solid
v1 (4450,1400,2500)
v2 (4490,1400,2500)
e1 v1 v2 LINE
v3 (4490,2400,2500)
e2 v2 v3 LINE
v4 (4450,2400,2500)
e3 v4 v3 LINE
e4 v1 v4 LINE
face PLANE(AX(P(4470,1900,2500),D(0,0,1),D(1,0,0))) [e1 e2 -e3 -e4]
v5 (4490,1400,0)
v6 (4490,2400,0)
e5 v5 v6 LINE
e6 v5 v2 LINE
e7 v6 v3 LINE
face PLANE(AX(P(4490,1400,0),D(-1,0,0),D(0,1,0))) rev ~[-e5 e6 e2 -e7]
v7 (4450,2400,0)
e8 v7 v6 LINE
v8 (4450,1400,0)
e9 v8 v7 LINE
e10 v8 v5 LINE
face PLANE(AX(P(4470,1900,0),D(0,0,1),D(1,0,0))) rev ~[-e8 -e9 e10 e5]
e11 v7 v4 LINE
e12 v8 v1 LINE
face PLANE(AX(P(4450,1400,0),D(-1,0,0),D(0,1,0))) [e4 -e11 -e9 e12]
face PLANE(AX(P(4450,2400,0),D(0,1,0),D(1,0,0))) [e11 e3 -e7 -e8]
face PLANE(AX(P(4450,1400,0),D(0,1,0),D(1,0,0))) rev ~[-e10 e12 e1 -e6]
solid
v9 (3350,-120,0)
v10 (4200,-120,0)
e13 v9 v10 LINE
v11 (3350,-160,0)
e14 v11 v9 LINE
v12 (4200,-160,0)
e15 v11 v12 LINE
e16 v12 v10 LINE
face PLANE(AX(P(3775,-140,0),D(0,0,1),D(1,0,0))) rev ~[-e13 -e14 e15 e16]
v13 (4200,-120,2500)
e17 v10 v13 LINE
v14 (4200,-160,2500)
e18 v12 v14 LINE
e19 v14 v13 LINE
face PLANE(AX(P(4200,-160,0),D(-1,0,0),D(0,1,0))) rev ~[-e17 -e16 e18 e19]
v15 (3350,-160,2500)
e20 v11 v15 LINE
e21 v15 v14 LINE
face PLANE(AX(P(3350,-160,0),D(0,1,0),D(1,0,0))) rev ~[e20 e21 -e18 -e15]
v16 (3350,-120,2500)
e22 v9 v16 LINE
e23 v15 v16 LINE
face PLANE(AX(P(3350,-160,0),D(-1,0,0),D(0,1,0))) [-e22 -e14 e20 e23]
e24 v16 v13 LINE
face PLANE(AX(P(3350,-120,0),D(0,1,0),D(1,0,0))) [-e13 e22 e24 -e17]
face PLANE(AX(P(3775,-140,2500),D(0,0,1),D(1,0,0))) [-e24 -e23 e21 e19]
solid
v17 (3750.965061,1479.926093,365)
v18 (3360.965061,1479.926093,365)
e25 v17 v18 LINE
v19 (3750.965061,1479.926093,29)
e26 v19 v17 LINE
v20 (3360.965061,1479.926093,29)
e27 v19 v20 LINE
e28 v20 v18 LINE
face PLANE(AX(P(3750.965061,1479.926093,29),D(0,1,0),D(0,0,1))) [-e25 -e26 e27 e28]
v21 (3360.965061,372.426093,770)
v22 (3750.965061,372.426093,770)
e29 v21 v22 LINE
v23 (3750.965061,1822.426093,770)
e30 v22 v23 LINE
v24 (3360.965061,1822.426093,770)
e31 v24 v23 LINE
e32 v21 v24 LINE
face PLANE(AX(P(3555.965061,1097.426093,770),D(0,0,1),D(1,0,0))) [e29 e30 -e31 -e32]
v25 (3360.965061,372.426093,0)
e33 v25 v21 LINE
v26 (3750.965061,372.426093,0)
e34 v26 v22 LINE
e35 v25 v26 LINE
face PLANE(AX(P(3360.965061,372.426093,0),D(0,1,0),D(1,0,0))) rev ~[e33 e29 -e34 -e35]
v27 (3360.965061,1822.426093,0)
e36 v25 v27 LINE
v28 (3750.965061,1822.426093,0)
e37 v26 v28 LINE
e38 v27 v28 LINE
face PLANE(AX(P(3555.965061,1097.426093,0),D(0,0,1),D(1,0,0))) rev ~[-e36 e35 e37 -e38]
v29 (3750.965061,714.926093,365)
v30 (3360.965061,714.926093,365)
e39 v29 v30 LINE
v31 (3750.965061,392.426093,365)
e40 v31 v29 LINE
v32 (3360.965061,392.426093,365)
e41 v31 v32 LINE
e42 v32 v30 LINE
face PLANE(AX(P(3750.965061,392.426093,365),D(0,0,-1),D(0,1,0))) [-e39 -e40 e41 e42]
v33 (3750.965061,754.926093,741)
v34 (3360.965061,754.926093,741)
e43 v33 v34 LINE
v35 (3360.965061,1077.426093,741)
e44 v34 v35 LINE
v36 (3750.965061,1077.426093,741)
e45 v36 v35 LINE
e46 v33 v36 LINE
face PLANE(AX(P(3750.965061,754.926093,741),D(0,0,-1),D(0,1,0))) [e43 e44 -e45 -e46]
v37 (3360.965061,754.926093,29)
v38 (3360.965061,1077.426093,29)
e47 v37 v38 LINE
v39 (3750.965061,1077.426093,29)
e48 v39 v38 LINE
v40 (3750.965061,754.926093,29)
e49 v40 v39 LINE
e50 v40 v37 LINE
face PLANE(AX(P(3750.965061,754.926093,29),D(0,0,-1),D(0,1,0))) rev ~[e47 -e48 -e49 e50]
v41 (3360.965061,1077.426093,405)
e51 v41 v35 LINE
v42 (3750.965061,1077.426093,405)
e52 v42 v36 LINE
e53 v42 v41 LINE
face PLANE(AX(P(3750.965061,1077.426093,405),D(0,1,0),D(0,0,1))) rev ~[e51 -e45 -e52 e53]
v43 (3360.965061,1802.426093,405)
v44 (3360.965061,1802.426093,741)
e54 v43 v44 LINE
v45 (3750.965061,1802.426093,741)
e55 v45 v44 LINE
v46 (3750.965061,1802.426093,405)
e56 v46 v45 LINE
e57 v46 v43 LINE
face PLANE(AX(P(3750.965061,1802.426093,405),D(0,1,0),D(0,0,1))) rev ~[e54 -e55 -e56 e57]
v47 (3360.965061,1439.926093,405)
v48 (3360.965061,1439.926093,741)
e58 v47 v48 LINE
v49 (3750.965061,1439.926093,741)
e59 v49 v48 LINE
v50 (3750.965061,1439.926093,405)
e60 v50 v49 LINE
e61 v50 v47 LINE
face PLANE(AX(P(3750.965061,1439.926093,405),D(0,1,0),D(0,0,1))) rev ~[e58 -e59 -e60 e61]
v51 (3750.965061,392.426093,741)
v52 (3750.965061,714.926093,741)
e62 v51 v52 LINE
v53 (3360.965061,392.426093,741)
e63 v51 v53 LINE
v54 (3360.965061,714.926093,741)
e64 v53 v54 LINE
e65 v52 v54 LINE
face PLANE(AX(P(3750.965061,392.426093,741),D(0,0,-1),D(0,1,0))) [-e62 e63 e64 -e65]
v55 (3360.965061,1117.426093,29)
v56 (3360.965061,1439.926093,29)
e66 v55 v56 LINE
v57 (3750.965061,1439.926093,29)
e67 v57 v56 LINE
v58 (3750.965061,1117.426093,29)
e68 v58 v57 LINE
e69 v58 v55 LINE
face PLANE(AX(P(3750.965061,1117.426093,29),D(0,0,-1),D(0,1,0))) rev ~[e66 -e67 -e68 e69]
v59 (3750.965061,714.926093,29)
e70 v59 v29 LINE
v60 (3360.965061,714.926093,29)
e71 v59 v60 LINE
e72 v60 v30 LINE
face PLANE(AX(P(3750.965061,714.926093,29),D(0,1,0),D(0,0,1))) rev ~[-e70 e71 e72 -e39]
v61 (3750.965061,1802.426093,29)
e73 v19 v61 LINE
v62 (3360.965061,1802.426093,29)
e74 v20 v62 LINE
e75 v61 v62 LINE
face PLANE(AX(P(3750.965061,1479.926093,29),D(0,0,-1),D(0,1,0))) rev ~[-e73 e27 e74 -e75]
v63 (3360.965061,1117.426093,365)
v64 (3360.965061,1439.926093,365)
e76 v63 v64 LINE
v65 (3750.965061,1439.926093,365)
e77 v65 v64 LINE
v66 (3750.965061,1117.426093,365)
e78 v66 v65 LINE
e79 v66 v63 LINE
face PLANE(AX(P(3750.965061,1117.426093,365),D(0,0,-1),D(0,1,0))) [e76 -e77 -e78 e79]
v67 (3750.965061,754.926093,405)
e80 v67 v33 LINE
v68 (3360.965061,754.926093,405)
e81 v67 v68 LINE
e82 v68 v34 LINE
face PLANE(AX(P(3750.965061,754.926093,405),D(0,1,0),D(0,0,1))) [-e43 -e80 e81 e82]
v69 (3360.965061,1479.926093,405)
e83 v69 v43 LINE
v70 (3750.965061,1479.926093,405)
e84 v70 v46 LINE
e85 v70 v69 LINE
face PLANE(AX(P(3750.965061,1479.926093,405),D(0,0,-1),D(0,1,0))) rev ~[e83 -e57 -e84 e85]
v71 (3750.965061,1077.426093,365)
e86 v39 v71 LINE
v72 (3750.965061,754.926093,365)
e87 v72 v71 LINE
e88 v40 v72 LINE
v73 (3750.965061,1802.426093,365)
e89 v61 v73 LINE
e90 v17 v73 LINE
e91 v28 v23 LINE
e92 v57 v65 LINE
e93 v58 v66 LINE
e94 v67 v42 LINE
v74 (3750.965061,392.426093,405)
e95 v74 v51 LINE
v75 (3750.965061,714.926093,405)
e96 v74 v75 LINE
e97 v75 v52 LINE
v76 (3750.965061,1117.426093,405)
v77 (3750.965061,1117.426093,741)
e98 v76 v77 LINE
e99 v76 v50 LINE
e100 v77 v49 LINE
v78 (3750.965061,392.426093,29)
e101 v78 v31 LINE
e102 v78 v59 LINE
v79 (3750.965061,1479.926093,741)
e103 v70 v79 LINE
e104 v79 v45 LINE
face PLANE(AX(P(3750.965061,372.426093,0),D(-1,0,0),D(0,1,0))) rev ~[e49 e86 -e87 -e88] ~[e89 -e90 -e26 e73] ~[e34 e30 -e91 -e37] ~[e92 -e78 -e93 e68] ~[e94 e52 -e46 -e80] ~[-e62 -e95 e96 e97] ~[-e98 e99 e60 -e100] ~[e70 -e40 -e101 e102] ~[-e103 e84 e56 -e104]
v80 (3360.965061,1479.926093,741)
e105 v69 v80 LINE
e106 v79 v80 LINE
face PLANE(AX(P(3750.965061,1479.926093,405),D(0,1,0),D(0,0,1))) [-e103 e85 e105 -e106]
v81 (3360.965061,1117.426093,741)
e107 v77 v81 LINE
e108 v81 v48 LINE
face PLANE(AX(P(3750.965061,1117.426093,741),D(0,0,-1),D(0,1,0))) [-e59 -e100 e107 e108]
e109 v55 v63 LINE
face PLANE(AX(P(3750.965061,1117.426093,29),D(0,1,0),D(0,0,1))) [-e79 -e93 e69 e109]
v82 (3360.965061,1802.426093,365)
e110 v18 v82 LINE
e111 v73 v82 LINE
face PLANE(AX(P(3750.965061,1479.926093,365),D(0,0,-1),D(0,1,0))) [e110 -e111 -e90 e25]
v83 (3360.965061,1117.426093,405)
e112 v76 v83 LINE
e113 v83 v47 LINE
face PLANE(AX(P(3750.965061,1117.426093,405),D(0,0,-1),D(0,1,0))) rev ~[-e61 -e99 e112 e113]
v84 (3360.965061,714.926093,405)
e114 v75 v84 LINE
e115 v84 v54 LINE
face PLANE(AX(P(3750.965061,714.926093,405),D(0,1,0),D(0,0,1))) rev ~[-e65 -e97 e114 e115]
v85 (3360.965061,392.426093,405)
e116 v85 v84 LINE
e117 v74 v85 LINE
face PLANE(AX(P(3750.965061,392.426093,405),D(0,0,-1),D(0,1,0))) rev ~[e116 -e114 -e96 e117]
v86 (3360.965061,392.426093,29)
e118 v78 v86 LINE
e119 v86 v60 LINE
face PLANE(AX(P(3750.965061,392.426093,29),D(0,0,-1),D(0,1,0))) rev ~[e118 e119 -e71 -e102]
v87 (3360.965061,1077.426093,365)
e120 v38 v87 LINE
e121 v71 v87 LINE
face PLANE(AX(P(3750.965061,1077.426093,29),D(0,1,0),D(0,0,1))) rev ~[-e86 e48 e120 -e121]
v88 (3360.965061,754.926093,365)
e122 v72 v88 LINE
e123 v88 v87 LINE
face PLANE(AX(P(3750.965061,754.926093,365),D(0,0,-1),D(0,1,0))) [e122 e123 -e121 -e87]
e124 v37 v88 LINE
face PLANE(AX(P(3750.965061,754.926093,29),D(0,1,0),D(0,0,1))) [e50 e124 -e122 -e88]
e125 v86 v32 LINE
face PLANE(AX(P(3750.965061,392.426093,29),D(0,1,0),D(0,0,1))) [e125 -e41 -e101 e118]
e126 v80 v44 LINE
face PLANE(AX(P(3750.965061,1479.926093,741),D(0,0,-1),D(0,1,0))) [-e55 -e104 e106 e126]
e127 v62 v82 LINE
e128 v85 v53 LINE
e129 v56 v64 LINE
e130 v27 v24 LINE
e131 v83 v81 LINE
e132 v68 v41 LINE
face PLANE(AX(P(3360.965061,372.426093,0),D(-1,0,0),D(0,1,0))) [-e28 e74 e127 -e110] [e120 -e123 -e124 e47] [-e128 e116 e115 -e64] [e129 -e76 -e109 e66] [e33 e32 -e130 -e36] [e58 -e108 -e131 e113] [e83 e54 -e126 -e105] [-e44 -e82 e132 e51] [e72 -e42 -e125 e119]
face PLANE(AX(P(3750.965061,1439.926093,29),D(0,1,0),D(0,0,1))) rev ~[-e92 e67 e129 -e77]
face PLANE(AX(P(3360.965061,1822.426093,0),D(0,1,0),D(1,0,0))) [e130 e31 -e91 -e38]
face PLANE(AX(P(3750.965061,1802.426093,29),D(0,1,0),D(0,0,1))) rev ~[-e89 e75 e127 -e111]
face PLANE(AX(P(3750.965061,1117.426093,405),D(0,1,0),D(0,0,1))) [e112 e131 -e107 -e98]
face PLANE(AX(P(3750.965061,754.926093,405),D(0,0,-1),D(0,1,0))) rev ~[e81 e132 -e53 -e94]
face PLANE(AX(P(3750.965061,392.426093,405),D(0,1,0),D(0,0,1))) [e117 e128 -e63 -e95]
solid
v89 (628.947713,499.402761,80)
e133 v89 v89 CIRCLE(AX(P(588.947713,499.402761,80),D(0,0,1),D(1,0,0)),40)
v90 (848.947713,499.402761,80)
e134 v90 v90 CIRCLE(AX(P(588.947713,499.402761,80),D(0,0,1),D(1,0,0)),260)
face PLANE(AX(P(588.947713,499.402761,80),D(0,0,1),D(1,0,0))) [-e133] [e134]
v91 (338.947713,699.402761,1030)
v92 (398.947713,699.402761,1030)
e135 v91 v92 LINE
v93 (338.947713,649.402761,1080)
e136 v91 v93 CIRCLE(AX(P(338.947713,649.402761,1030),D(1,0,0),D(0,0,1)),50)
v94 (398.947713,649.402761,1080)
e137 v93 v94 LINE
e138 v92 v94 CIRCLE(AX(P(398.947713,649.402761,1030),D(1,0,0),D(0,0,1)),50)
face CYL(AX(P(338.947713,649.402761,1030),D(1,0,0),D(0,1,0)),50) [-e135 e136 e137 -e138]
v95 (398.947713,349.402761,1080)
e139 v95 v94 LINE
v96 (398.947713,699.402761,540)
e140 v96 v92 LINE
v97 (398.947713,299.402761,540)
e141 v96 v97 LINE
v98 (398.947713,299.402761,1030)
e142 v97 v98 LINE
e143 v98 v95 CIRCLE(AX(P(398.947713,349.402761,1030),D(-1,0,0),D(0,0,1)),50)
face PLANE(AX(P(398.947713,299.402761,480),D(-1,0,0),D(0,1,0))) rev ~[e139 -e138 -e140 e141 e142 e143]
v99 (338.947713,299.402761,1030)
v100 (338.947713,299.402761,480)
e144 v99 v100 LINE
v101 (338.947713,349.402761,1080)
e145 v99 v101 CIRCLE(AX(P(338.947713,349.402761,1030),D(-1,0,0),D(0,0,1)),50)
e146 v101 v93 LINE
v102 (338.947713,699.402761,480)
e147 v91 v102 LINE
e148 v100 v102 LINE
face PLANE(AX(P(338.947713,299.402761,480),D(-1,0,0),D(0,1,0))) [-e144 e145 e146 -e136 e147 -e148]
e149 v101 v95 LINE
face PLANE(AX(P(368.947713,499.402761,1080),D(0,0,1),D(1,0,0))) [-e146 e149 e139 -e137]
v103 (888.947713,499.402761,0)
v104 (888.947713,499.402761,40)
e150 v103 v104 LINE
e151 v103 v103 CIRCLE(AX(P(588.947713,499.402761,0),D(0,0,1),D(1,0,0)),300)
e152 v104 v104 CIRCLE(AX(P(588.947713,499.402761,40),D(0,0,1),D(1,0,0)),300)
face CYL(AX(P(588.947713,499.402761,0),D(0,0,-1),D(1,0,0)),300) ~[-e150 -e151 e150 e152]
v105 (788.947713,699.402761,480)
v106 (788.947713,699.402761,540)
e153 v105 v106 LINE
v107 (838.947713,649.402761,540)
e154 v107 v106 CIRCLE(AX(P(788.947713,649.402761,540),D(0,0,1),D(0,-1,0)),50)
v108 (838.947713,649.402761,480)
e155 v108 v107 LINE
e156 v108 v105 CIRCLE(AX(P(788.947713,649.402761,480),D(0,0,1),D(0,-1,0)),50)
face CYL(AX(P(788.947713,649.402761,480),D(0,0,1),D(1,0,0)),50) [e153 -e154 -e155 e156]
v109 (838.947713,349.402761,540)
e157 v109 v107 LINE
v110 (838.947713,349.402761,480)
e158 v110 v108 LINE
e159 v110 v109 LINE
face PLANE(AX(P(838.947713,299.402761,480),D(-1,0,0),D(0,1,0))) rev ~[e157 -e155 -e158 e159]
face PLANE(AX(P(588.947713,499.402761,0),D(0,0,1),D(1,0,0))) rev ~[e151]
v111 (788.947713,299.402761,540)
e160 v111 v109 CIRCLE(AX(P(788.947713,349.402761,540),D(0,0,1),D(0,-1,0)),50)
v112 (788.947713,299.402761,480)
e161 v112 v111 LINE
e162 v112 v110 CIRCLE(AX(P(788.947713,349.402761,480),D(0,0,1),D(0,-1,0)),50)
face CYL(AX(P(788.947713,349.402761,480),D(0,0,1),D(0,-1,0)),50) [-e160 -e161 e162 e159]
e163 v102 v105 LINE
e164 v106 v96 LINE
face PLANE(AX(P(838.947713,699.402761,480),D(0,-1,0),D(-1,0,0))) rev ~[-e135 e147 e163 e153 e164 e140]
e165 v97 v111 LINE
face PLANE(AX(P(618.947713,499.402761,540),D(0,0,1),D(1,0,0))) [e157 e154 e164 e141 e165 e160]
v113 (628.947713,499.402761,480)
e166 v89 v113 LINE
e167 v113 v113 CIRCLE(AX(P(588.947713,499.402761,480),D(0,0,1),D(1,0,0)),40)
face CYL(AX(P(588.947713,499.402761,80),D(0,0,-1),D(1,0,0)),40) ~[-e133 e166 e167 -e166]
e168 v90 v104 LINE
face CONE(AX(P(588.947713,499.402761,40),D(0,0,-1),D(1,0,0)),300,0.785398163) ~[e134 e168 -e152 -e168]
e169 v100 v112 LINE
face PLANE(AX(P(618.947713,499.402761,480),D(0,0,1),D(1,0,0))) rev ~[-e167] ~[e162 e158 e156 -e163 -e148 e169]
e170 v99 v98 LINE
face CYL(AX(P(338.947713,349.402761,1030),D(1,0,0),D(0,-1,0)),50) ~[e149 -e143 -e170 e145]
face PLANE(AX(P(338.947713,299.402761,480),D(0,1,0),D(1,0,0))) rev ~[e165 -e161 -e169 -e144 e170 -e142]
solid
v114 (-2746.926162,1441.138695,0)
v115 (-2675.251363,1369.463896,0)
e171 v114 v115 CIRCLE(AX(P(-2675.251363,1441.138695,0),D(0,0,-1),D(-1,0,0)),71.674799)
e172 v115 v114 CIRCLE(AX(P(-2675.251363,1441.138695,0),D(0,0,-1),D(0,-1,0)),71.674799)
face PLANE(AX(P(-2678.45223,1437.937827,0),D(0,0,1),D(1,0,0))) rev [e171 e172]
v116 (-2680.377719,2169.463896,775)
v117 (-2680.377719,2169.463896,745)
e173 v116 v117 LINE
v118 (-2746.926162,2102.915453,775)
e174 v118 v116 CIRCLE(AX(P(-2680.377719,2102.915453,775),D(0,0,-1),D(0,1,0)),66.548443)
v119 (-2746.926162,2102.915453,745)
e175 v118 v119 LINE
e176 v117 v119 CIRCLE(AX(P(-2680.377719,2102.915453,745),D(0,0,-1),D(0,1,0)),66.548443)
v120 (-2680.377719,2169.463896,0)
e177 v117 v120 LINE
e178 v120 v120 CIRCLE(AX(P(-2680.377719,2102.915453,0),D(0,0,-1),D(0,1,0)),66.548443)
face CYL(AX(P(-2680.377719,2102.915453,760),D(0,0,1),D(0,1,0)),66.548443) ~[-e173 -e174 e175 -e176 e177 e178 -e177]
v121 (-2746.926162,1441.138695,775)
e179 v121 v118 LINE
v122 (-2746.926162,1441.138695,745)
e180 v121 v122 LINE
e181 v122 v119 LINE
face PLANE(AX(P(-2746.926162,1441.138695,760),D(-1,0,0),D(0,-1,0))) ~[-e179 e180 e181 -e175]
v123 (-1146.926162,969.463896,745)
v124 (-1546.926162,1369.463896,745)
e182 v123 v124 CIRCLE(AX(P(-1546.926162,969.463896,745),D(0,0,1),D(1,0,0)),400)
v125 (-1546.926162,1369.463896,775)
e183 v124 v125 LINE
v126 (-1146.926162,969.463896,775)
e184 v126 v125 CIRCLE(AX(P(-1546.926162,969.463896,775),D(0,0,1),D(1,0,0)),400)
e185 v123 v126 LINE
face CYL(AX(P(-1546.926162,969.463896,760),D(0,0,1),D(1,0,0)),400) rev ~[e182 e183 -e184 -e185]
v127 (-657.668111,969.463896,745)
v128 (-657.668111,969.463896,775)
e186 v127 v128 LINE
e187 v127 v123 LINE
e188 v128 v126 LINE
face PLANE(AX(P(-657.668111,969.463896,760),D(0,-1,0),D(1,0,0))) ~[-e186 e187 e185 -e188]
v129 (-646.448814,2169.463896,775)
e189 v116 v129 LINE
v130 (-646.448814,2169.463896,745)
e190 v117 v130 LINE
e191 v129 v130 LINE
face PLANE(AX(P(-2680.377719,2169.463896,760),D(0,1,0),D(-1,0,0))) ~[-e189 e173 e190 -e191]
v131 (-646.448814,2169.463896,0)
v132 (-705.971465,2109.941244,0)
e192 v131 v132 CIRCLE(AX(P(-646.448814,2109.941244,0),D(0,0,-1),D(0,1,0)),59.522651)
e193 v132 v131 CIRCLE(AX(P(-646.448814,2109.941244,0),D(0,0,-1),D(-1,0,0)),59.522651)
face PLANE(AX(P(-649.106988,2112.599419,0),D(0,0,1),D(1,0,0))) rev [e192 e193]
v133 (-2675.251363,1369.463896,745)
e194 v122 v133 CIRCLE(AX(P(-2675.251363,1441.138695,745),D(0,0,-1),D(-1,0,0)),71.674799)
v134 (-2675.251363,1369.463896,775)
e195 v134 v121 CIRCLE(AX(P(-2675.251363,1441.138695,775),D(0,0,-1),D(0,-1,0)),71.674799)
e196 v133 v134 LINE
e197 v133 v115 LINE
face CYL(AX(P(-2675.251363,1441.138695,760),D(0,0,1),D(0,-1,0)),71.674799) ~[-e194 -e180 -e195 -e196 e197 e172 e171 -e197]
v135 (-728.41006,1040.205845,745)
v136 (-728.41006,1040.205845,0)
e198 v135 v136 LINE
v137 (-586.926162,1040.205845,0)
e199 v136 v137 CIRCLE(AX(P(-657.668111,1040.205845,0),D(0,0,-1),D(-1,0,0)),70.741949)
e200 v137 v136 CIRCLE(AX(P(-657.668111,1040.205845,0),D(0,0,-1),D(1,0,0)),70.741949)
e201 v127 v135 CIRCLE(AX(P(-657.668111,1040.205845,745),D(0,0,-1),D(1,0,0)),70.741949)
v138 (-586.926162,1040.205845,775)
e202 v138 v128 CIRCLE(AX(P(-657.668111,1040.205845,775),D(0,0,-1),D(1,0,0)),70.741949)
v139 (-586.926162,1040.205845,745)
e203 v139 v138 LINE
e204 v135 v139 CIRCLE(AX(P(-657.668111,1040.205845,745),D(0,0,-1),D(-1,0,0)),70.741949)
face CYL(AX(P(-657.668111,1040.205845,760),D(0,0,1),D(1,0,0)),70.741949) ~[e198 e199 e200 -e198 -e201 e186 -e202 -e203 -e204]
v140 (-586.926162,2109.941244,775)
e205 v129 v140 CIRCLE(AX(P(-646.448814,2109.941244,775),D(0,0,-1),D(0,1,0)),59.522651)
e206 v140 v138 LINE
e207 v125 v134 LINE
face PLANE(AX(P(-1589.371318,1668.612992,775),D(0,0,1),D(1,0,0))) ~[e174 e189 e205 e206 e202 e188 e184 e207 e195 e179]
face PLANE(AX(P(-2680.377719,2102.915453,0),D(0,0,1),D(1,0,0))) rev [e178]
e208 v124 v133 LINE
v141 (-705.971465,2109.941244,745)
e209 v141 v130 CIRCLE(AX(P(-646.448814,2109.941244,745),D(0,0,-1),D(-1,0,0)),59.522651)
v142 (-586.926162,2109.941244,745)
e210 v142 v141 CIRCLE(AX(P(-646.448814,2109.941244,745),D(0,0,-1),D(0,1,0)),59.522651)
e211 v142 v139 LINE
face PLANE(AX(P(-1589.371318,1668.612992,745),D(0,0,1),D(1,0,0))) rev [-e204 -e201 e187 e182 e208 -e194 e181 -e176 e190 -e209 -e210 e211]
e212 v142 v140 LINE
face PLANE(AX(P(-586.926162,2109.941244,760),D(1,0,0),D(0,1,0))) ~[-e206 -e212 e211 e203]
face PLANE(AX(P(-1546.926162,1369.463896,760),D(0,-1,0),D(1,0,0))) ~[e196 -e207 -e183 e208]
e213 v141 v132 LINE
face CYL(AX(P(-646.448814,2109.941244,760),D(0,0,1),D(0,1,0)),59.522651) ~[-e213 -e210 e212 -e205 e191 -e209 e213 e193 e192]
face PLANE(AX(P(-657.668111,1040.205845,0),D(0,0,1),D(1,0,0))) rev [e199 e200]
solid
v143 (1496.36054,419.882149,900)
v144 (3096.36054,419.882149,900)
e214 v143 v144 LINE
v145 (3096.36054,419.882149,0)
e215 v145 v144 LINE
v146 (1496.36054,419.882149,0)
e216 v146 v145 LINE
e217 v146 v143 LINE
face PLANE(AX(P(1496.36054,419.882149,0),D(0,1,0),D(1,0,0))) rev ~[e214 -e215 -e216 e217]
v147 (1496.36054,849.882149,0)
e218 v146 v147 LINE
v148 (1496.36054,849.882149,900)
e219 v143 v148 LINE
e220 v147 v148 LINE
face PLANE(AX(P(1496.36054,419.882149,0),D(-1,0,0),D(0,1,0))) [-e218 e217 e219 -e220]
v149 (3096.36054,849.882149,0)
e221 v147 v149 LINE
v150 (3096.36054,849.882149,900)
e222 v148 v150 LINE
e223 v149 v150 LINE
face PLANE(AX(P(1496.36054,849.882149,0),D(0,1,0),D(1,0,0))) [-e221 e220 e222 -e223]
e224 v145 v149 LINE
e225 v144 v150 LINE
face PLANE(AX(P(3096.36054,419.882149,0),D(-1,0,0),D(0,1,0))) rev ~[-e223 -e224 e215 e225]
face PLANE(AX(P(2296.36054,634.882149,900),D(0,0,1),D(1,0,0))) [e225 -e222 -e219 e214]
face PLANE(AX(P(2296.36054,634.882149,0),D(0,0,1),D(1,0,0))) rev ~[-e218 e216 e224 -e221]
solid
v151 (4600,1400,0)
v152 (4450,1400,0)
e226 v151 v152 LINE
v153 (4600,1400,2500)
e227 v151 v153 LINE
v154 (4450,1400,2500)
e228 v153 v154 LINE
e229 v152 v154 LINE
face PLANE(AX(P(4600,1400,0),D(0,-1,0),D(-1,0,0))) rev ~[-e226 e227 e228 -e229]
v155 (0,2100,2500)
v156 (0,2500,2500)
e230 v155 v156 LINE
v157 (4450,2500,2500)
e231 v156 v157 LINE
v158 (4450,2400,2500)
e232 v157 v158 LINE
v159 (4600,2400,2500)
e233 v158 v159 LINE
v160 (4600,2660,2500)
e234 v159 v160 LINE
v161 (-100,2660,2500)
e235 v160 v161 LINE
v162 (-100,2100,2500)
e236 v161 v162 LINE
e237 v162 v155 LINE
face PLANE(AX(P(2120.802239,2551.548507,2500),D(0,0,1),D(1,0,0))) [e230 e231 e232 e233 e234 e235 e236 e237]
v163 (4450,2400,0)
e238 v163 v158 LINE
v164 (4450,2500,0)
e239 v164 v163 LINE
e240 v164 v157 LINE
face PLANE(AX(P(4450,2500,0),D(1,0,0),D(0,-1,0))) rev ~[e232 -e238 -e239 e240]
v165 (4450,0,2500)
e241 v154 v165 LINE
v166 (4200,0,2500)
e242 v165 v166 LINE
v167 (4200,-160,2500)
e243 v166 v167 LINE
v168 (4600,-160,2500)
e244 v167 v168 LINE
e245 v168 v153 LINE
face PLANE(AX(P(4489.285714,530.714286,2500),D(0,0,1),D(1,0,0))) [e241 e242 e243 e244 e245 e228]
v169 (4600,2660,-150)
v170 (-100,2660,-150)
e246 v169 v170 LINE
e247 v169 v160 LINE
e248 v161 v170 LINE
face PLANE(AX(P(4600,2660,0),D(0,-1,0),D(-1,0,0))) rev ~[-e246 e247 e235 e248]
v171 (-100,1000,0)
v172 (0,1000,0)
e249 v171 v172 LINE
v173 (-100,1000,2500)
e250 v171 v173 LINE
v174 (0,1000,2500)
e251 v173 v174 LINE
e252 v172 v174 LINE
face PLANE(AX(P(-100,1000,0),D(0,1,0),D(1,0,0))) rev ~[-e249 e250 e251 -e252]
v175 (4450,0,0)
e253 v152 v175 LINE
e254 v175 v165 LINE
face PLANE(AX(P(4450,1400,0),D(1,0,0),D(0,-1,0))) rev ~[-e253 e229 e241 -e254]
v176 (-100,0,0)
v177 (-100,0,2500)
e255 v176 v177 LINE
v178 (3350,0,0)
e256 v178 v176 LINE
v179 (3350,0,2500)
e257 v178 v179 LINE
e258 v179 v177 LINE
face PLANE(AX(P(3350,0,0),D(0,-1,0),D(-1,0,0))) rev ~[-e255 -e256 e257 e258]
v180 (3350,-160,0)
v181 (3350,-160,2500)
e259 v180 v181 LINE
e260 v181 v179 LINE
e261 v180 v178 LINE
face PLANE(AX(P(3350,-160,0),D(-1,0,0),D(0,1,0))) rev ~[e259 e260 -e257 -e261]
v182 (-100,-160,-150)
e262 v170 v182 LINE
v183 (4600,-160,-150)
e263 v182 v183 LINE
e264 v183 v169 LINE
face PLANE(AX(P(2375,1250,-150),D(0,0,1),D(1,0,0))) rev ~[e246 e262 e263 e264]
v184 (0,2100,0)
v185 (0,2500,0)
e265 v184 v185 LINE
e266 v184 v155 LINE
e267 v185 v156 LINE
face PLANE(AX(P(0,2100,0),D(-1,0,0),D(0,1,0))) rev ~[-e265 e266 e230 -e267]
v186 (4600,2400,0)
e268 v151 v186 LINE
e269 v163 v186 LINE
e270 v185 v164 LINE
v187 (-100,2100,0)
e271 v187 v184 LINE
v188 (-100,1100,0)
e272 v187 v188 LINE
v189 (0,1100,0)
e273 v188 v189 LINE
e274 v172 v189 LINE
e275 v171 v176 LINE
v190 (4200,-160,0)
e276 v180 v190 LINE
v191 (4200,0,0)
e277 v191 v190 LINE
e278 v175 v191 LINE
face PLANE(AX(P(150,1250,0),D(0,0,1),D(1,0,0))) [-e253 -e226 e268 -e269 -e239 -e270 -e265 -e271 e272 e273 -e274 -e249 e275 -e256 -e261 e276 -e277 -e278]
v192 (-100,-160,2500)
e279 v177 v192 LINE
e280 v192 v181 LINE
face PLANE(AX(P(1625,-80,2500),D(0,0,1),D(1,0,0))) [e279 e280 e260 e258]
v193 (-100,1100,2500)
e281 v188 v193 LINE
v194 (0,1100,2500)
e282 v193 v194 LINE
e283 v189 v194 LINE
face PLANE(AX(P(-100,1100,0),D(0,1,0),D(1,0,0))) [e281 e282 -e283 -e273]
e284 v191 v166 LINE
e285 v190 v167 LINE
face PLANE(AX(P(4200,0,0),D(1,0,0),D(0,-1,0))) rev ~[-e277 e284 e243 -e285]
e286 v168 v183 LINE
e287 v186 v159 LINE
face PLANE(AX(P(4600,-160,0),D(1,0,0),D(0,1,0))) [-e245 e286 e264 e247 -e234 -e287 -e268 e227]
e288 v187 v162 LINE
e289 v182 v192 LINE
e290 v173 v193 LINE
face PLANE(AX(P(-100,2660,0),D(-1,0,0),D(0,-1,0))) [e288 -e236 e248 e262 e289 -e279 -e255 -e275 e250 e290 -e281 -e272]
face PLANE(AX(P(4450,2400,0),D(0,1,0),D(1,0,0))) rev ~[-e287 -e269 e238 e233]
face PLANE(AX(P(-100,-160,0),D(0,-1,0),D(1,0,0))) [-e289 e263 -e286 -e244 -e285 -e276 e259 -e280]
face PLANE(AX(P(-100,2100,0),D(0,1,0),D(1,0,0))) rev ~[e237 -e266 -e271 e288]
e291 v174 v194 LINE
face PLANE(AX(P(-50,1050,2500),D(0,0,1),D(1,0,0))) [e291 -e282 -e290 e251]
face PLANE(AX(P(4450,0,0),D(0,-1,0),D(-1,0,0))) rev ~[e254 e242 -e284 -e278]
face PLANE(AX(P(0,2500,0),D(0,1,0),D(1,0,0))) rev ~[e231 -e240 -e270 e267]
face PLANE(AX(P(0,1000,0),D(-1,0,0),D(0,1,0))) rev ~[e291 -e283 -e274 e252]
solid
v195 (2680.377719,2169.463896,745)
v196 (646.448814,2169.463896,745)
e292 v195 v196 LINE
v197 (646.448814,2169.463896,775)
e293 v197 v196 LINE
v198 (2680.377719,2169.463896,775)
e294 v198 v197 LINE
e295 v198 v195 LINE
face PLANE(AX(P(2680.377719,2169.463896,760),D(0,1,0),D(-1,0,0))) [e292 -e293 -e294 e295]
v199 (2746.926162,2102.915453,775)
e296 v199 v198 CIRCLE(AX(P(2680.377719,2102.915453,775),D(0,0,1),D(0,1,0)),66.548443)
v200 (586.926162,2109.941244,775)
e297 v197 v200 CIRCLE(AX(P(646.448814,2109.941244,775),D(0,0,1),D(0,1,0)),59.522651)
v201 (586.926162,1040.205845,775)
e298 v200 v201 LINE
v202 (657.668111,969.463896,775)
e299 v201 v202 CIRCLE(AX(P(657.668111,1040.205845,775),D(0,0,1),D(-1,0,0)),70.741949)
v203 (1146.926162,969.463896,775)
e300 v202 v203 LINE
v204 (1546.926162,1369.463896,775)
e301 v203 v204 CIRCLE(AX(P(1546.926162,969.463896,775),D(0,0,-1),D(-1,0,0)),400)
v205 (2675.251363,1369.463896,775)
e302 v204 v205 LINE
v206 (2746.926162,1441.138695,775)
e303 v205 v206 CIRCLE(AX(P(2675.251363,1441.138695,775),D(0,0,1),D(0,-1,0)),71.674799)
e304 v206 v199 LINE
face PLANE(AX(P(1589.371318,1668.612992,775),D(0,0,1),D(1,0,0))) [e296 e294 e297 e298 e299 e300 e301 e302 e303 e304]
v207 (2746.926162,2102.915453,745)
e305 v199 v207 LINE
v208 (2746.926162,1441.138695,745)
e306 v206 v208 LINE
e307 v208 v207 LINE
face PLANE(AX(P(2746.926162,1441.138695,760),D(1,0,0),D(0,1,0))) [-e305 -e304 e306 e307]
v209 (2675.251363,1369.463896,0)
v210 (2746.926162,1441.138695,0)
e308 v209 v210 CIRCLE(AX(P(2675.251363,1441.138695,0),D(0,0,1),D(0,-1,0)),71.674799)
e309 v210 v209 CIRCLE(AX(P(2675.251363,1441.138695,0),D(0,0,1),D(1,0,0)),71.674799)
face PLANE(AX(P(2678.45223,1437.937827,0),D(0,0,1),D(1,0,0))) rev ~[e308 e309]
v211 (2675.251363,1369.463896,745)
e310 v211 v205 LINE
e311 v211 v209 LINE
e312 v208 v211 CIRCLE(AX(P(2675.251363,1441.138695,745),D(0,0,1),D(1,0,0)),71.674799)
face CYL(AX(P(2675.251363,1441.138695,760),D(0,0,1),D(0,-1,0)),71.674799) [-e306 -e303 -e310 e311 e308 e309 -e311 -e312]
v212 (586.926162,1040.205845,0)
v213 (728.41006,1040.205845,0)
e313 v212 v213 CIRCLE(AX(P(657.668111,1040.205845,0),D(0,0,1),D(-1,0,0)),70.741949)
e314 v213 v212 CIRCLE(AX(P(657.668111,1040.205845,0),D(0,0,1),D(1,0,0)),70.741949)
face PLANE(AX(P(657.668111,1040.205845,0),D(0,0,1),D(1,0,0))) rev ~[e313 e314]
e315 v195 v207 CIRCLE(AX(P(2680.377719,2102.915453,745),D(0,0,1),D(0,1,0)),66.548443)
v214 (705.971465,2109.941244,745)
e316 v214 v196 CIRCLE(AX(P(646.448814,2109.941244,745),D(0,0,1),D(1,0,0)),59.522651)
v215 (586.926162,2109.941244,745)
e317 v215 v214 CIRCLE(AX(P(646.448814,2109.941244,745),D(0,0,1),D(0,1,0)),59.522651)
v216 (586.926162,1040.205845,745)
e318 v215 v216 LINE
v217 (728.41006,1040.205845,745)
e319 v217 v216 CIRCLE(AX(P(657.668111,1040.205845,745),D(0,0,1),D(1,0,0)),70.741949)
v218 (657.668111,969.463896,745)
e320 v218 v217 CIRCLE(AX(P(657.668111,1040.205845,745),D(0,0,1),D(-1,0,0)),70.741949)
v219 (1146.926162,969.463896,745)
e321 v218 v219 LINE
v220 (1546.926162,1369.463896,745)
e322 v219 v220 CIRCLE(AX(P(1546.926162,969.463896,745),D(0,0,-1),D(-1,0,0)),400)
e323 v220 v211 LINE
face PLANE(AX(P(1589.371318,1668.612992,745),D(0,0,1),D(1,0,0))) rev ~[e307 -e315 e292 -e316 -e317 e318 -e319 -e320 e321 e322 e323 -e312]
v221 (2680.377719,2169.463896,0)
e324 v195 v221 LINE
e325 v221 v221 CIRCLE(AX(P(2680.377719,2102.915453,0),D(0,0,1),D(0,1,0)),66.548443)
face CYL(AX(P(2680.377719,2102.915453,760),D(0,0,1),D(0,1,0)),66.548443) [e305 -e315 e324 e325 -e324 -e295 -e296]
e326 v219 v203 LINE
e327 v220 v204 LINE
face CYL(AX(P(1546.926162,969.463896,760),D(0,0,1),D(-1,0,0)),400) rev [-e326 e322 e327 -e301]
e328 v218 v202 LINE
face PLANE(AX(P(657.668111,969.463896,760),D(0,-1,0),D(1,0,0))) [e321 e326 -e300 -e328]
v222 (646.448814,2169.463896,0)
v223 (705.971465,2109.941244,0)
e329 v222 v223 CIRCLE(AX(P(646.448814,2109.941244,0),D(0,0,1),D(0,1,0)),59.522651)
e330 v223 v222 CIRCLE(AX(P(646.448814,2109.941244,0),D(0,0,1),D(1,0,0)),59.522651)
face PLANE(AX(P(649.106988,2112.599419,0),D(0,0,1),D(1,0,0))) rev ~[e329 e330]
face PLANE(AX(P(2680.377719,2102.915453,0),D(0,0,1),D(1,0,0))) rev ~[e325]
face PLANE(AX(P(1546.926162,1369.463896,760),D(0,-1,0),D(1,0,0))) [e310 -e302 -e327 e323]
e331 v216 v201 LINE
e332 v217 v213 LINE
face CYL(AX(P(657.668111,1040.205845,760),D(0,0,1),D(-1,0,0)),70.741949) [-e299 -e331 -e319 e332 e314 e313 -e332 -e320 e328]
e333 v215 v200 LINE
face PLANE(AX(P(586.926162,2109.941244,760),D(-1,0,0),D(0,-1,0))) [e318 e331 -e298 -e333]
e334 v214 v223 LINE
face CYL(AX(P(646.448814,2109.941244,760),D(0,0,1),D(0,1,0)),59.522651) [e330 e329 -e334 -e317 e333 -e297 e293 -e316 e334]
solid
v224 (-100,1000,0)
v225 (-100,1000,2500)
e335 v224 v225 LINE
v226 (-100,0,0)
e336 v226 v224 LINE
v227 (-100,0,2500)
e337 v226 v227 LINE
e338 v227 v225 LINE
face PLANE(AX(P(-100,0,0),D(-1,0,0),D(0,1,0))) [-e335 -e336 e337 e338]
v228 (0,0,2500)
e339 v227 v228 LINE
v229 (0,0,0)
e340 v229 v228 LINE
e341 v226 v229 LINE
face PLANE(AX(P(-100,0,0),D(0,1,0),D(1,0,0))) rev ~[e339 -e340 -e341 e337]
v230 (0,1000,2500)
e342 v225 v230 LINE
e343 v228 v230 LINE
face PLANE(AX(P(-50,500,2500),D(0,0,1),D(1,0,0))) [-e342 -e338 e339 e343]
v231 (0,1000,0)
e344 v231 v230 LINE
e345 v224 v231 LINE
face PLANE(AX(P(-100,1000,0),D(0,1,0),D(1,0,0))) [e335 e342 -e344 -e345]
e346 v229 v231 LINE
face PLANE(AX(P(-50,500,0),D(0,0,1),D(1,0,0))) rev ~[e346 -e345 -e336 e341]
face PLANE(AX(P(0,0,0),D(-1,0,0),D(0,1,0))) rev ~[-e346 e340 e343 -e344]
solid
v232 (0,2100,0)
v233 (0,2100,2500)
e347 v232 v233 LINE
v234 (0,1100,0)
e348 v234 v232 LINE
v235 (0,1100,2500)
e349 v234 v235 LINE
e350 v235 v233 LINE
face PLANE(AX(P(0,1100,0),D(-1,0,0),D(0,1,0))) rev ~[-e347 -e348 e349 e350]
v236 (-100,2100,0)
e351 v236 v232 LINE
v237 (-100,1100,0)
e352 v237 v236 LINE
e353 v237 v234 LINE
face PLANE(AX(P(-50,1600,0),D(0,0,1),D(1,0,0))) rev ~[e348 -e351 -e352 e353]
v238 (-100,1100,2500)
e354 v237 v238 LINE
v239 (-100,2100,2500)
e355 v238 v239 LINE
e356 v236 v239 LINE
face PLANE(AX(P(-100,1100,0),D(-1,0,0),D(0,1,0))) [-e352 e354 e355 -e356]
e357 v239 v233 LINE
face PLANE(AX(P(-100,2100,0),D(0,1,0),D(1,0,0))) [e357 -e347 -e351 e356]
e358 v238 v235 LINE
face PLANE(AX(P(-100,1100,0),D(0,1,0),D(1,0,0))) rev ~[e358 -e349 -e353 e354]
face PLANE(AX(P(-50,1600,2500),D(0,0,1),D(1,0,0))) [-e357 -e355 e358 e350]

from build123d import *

# Parameters (mm, degrees)
F0_W      = 100
F0_H      = 1000
F0_H_2    = 100
F0_W_2    = 850
F0_H_3    = 120
F0_H_4    = 40
F0_W_3    = 110
F0_W_4    = 40
F1_DEPTH  = 150
F2_DEPTH  = 150
F3_DEPTH  = 2500
F4_DEPTH  = 2500
F5_DEPTH  = 2500
F8_DEPTH  = 15
F9_DEPTH  = 760
F11_W     = 1600
F11_H     = 430
F12_DEPTH = 900
F13_W     = 390
F13_H     = 1450
F14_DEPTH = 770
F15_W     = 322.5
F15_H     = 336
F16_DEPTH = 390
F17_R     = 300
F18_DEPTH = 80
F19_R     = 40
F20_DEPTH = 400
F21_W     = 440
F21_H     = 400
F21_W_2   = 60
F22_DEPTH = 60
F23_DEPTH = 600
F24_R     = 50
F25_SIZE  = 40


with BuildPart() as f1:
    # F0 (on Top) → F1 (new body)
    with BuildSketch(Plane.XY):
        Polygon((300, 2500), (300, 0), (3350, 0), (4200, 0), (4450, 0), (4450, 1400), (4450, 2400), (4450, 2500), align=None)
        Polygon((0, 2500), (300, 2500), (4450, 2500), (4450, 2400), (4490, 2400), (4600, 2400), (4600, 2660), (-100, 2660), (-100, 2100), (0, 2100), align=None)
        with Locations((-50, 1600)):
            Rectangle(F0_W, F0_H)
        with Locations((-50, 1050)):
            Rectangle(F0_W, F0_H_2)
        with Locations((-50, 500)):
            Rectangle(F0_W, F0_H)
        Polygon((300, 0), (0, 0), (-100, 0), (-100, -160), (3350, -160), (3350, -120), (3350, 0), align=None)
        with Locations((3775, -60)):
            Rectangle(F0_W_2, F0_H_3)
        with Locations((3775, -140)):
            Rectangle(F0_W_2, F0_H_4)
        Polygon((4450, 0), (4200, 0), (4200, -120), (4200, -160), (4600, -160), (4600, 1400), (4490, 1400), (4450, 1400), align=None)
        with Locations((4545, 1900)):
            Rectangle(F0_W_3, F0_H)
        with Locations((4470, 1900)):
            Rectangle(F0_W_4, F0_H)
    extrude(amount=-F1_DEPTH)

    # F0 (on Top) → F2 (join, through all)
    with BuildSketch(Plane.XY):
        Polygon((0, 1000), (0, 0), (300, 0), (300, 2500), (0, 2500), (0, 2100), (0, 1100), align=None)
    extrude(amount=-F2_DEPTH)

    # F0 (on Top) → F3 (join)
    with BuildSketch(Plane.XY):
        Polygon((0, 2500), (300, 2500), (4450, 2500), (4450, 2400), (4490, 2400), (4600, 2400), (4600, 2660), (-100, 2660), (-100, 2100), (0, 2100), align=None)
        Polygon((4450, 0), (4200, 0), (4200, -120), (4200, -160), (4600, -160), (4600, 1400), (4490, 1400), (4450, 1400), align=None)
        Polygon((300, 0), (0, 0), (-100, 0), (-100, -160), (3350, -160), (3350, -120), (3350, 0), align=None)
        with Locations((-50, 1050)):
            Rectangle(F0_W, F0_H_2)
    extrude(amount=F3_DEPTH)


with BuildPart() as f4:
    # F0 (on Top) → F4 (new body, through all)
    with BuildSketch(Plane.XY):
        with Locations((-50, 1600)):
            Rectangle(F0_W, F0_H)
    extrude(amount=F4_DEPTH)


with BuildPart() as f4b:
    # F0 (on Top) → F4, piece 2 (new body, through all)
    with BuildSketch(Plane.XY):
        with Locations((-50, 500)):
            Rectangle(F0_W, F0_H)
    extrude(amount=F4_DEPTH)


with BuildPart() as f5:
    # F0 (on Top) → F5 (new body, through all)
    with BuildSketch(Plane.XY):
        with Locations((4470, 1900)):
            Rectangle(F0_W_4, F0_H)
    extrude(amount=F5_DEPTH)


with BuildPart() as f5b:
    # F0 (on Top) → F5, piece 2 (new body, through all)
    with BuildSketch(Plane.XY):
        with Locations((3775, -140)):
            Rectangle(F0_W_2, F0_H_4)
    extrude(amount=F5_DEPTH)


with BuildPart() as f8:
    # F7 (on offset) → F8 (new body, symmetric)
    with BuildSketch(Plane.XY.offset(760)):
        with BuildLine():
            Line((2680.377719402, 2169.4638956216), (646.4488137391, 2169.4638956216))
            ThreePointArc((646.4488137391, 2169.4638956216), (688.5376842462, 2152.0301146325), (705.9714652353, 2109.9412441254))
            ThreePointArc((705.9714652353, 2109.9412441254), (646.4488137391, 2050.4185926292), (586.9261622429, 2109.9412441254))
            Line((586.9261622429, 2109.9412441254), (586.9261622429, 1040.2058445736))
            ThreePointArc((586.9261622429, 1040.2058445736), (657.6681111949, 1110.9477935256), (728.410060147, 1040.2058445736))
            ThreePointArc((728.410060147, 1040.2058445736), (707.6902230133, 990.1837327553), (657.6681111949, 969.4638956216))
            Line((657.6681111949, 969.4638956216), (1146.9261622429, 969.4638956216))
            ThreePointArc((1146.9261622429, 969.4638956216), (1264.0834497683, 1252.3066080962), (1546.9261622429, 1369.4638956216))
            Line((1546.9261622429, 1369.4638956216), (2675.2513630672, 1369.4638956216))
            ThreePointArc((2675.2513630672, 1369.4638956216), (2624.5696265299, 1491.8204313346), (2746.9261622429, 1441.1386947972))
            Line((2746.9261622429, 1441.1386947972), (2746.9261622429, 2102.9154527807))
            ThreePointArc((2746.9261622429, 2102.9154527807), (2633.3208641919, 2055.8585975705), (2680.377719402, 2169.4638956216))
        make_face()
        with BuildLine():
            ThreePointArc((705.9714652353, 2109.9412441254), (688.5376842462, 2152.0301146325), (646.4488137391, 2169.4638956216))
            ThreePointArc((646.4488137391, 2169.4638956216), (604.3599432319, 2152.0301146325), (586.9261622429, 2109.9412441254))
            ThreePointArc((586.9261622429, 2109.9412441254), (646.4488137391, 2050.4185926292), (705.9714652353, 2109.9412441254))
        make_face()
        with BuildLine():
            ThreePointArc((2746.9261622429, 2102.9154527807), (2727.4345746122, 2149.9723079909), (2680.377719402, 2169.4638956216))
            ThreePointArc((2680.377719402, 2169.4638956216), (2633.3208641919, 2055.8585975705), (2746.9261622429, 2102.9154527807))
        make_face()
        with BuildLine():
            ThreePointArc((2675.2513630672, 1369.4638956216), (2725.9330996045, 1390.4569582599), (2746.9261622429, 1441.1386947972))
            ThreePointArc((2746.9261622429, 1441.1386947972), (2624.5696265299, 1491.8204313346), (2675.2513630672, 1369.4638956216))
        make_face()
        with BuildLine():
            ThreePointArc((728.410060147, 1040.2058445736), (657.6681111949, 1110.9477935256), (586.9261622429, 1040.2058445736))
            ThreePointArc((586.9261622429, 1040.2058445736), (607.6459993766, 990.1837327553), (657.6681111949, 969.4638956216))
            ThreePointArc((657.6681111949, 969.4638956216), (707.6902230133, 990.1837327553), (728.410060147, 1040.2058445736))
        make_face()
    extrude(amount=F8_DEPTH, both=True)

    # F7 (on offset) → F9 (join, through all)
    with BuildSketch(Plane.XY.offset(760)):
        with BuildLine():
            ThreePointArc((705.9714652353, 2109.9412441254), (688.5376842462, 2152.0301146325), (646.4488137391, 2169.4638956216))
            ThreePointArc((646.4488137391, 2169.4638956216), (604.3599432319, 2152.0301146325), (586.9261622429, 2109.9412441254))
            ThreePointArc((586.9261622429, 2109.9412441254), (646.4488137391, 2050.4185926292), (705.9714652353, 2109.9412441254))
        make_face()
        with BuildLine():
            ThreePointArc((2746.9261622429, 2102.9154527807), (2727.4345746122, 2149.9723079909), (2680.377719402, 2169.4638956216))
            ThreePointArc((2680.377719402, 2169.4638956216), (2633.3208641919, 2055.8585975705), (2746.9261622429, 2102.9154527807))
        make_face()
        with BuildLine():
            ThreePointArc((2675.2513630672, 1369.4638956216), (2725.9330996045, 1390.4569582599), (2746.9261622429, 1441.1386947972))
            ThreePointArc((2746.9261622429, 1441.1386947972), (2624.5696265299, 1491.8204313346), (2675.2513630672, 1369.4638956216))
        make_face()
        with BuildLine():
            ThreePointArc((728.410060147, 1040.2058445736), (657.6681111949, 1110.9477935256), (586.9261622429, 1040.2058445736))
            ThreePointArc((586.9261622429, 1040.2058445736), (607.6459993766, 990.1837327553), (657.6681111949, 969.4638956216))
            ThreePointArc((657.6681111949, 969.4638956216), (707.6902230133, 990.1837327553), (728.410060147, 1040.2058445736))
        make_face()
    extrude(amount=-F9_DEPTH)


with BuildPart() as f10_1:
    # F10: instance of F8
    add(f8.part.mirror(Plane.YZ))


with BuildPart() as f12:
    # F11 (on Top) → F12 (new body)
    with BuildSketch(Plane.XY):
        with Locations((2296.36054039, 634.8821485043)):
            Rectangle(F11_W, F11_H)
    extrude(amount=F12_DEPTH)


with BuildPart() as f14:
    # F13 (on Top) → F14 (new body)
    with BuildSketch(Plane.XY):
        with Locations((3555.9650611877, 1097.4260926247)):
            Rectangle(F13_W, F13_H)
    extrude(amount=F14_DEPTH)

    # F15 (on face) → F16 (cut, through all)
    with BuildSketch(Plane.YZ.offset(3750.9650611877)):
        with Locations((553.6760926247, 573)):
            Rectangle(F15_W, F15_H)
        with Locations((916.1760926247, 573)):
            Rectangle(F15_W, F15_H)
        with Locations((916.1760926247, 197)):
            Rectangle(F15_W, F15_H)
        with Locations((553.6760926247, 197)):
            Rectangle(F15_W, F15_H)
        with Locations((1278.6760926247, 573)):
            Rectangle(F15_W, F15_H)
        with Locations((1641.1760926247, 573)):
            Rectangle(F15_W, F15_H)
        with Locations((1278.6760926247, 197)):
            Rectangle(F15_W, F15_H)
        with Locations((1641.1760926247, 197)):
            Rectangle(F15_W, F15_H)
    extrude(amount=-F16_DEPTH, mode=Mode.SUBTRACT)


with BuildPart() as f18:
    # F17 (on Top) → F18 (new body)
    with BuildSketch(Plane.XY):
        with Locations((588.9477133751, 499.4027614594)):
            Circle(F17_R)
    extrude(amount=F18_DEPTH)

    # F19 (on face) → F20 (join)
    with BuildSketch(Plane.XY.offset(80)):
        with Locations((588.9477133751, 499.4027614594)):
            Circle(F19_R)
    extrude(amount=F20_DEPTH)

    # F21 (on face) → F22 (join)
    with BuildSketch(Plane.XY.offset(480)):
        with Locations((618.9477133751, 499.4027614594)):
            Rectangle(F21_W, F21_H)
        with Locations((368.9477133751, 499.4027614594)):
            Rectangle(F21_W_2, F21_H)
    extrude(amount=F22_DEPTH)

    # F21 (on face) → F23 (join)
    with BuildSketch(Plane.XY.offset(480)):
        with Locations((368.9477133751, 499.4027614594)):
            Rectangle(F21_W_2, F21_H)
    extrude(amount=F23_DEPTH)

    # F24
    f24_edges = [f18.edges().sort_by_distance(p)[0] for p in [
        (838.947713, 699.402761, 510),
        (838.947713, 299.402761, 510),
        (368.947713, 299.402761, 1080),
        (368.947713, 699.402761, 1080),
    ]]
    fillet(f24_edges, radius=F24_R)

    # F25
    f25_edges = [f18.edges().sort_by_distance(p)[0] for p in [
        (288.947713, 499.402761, 80),
    ]]
    chamfer(f25_edges, length=F25_SIZE)


solid = Compound([f1.part, f4.part, f4b.part, f5.part, f5b.part, f8.part, f10_1.part, f12.part, f14.part, f18.part])
